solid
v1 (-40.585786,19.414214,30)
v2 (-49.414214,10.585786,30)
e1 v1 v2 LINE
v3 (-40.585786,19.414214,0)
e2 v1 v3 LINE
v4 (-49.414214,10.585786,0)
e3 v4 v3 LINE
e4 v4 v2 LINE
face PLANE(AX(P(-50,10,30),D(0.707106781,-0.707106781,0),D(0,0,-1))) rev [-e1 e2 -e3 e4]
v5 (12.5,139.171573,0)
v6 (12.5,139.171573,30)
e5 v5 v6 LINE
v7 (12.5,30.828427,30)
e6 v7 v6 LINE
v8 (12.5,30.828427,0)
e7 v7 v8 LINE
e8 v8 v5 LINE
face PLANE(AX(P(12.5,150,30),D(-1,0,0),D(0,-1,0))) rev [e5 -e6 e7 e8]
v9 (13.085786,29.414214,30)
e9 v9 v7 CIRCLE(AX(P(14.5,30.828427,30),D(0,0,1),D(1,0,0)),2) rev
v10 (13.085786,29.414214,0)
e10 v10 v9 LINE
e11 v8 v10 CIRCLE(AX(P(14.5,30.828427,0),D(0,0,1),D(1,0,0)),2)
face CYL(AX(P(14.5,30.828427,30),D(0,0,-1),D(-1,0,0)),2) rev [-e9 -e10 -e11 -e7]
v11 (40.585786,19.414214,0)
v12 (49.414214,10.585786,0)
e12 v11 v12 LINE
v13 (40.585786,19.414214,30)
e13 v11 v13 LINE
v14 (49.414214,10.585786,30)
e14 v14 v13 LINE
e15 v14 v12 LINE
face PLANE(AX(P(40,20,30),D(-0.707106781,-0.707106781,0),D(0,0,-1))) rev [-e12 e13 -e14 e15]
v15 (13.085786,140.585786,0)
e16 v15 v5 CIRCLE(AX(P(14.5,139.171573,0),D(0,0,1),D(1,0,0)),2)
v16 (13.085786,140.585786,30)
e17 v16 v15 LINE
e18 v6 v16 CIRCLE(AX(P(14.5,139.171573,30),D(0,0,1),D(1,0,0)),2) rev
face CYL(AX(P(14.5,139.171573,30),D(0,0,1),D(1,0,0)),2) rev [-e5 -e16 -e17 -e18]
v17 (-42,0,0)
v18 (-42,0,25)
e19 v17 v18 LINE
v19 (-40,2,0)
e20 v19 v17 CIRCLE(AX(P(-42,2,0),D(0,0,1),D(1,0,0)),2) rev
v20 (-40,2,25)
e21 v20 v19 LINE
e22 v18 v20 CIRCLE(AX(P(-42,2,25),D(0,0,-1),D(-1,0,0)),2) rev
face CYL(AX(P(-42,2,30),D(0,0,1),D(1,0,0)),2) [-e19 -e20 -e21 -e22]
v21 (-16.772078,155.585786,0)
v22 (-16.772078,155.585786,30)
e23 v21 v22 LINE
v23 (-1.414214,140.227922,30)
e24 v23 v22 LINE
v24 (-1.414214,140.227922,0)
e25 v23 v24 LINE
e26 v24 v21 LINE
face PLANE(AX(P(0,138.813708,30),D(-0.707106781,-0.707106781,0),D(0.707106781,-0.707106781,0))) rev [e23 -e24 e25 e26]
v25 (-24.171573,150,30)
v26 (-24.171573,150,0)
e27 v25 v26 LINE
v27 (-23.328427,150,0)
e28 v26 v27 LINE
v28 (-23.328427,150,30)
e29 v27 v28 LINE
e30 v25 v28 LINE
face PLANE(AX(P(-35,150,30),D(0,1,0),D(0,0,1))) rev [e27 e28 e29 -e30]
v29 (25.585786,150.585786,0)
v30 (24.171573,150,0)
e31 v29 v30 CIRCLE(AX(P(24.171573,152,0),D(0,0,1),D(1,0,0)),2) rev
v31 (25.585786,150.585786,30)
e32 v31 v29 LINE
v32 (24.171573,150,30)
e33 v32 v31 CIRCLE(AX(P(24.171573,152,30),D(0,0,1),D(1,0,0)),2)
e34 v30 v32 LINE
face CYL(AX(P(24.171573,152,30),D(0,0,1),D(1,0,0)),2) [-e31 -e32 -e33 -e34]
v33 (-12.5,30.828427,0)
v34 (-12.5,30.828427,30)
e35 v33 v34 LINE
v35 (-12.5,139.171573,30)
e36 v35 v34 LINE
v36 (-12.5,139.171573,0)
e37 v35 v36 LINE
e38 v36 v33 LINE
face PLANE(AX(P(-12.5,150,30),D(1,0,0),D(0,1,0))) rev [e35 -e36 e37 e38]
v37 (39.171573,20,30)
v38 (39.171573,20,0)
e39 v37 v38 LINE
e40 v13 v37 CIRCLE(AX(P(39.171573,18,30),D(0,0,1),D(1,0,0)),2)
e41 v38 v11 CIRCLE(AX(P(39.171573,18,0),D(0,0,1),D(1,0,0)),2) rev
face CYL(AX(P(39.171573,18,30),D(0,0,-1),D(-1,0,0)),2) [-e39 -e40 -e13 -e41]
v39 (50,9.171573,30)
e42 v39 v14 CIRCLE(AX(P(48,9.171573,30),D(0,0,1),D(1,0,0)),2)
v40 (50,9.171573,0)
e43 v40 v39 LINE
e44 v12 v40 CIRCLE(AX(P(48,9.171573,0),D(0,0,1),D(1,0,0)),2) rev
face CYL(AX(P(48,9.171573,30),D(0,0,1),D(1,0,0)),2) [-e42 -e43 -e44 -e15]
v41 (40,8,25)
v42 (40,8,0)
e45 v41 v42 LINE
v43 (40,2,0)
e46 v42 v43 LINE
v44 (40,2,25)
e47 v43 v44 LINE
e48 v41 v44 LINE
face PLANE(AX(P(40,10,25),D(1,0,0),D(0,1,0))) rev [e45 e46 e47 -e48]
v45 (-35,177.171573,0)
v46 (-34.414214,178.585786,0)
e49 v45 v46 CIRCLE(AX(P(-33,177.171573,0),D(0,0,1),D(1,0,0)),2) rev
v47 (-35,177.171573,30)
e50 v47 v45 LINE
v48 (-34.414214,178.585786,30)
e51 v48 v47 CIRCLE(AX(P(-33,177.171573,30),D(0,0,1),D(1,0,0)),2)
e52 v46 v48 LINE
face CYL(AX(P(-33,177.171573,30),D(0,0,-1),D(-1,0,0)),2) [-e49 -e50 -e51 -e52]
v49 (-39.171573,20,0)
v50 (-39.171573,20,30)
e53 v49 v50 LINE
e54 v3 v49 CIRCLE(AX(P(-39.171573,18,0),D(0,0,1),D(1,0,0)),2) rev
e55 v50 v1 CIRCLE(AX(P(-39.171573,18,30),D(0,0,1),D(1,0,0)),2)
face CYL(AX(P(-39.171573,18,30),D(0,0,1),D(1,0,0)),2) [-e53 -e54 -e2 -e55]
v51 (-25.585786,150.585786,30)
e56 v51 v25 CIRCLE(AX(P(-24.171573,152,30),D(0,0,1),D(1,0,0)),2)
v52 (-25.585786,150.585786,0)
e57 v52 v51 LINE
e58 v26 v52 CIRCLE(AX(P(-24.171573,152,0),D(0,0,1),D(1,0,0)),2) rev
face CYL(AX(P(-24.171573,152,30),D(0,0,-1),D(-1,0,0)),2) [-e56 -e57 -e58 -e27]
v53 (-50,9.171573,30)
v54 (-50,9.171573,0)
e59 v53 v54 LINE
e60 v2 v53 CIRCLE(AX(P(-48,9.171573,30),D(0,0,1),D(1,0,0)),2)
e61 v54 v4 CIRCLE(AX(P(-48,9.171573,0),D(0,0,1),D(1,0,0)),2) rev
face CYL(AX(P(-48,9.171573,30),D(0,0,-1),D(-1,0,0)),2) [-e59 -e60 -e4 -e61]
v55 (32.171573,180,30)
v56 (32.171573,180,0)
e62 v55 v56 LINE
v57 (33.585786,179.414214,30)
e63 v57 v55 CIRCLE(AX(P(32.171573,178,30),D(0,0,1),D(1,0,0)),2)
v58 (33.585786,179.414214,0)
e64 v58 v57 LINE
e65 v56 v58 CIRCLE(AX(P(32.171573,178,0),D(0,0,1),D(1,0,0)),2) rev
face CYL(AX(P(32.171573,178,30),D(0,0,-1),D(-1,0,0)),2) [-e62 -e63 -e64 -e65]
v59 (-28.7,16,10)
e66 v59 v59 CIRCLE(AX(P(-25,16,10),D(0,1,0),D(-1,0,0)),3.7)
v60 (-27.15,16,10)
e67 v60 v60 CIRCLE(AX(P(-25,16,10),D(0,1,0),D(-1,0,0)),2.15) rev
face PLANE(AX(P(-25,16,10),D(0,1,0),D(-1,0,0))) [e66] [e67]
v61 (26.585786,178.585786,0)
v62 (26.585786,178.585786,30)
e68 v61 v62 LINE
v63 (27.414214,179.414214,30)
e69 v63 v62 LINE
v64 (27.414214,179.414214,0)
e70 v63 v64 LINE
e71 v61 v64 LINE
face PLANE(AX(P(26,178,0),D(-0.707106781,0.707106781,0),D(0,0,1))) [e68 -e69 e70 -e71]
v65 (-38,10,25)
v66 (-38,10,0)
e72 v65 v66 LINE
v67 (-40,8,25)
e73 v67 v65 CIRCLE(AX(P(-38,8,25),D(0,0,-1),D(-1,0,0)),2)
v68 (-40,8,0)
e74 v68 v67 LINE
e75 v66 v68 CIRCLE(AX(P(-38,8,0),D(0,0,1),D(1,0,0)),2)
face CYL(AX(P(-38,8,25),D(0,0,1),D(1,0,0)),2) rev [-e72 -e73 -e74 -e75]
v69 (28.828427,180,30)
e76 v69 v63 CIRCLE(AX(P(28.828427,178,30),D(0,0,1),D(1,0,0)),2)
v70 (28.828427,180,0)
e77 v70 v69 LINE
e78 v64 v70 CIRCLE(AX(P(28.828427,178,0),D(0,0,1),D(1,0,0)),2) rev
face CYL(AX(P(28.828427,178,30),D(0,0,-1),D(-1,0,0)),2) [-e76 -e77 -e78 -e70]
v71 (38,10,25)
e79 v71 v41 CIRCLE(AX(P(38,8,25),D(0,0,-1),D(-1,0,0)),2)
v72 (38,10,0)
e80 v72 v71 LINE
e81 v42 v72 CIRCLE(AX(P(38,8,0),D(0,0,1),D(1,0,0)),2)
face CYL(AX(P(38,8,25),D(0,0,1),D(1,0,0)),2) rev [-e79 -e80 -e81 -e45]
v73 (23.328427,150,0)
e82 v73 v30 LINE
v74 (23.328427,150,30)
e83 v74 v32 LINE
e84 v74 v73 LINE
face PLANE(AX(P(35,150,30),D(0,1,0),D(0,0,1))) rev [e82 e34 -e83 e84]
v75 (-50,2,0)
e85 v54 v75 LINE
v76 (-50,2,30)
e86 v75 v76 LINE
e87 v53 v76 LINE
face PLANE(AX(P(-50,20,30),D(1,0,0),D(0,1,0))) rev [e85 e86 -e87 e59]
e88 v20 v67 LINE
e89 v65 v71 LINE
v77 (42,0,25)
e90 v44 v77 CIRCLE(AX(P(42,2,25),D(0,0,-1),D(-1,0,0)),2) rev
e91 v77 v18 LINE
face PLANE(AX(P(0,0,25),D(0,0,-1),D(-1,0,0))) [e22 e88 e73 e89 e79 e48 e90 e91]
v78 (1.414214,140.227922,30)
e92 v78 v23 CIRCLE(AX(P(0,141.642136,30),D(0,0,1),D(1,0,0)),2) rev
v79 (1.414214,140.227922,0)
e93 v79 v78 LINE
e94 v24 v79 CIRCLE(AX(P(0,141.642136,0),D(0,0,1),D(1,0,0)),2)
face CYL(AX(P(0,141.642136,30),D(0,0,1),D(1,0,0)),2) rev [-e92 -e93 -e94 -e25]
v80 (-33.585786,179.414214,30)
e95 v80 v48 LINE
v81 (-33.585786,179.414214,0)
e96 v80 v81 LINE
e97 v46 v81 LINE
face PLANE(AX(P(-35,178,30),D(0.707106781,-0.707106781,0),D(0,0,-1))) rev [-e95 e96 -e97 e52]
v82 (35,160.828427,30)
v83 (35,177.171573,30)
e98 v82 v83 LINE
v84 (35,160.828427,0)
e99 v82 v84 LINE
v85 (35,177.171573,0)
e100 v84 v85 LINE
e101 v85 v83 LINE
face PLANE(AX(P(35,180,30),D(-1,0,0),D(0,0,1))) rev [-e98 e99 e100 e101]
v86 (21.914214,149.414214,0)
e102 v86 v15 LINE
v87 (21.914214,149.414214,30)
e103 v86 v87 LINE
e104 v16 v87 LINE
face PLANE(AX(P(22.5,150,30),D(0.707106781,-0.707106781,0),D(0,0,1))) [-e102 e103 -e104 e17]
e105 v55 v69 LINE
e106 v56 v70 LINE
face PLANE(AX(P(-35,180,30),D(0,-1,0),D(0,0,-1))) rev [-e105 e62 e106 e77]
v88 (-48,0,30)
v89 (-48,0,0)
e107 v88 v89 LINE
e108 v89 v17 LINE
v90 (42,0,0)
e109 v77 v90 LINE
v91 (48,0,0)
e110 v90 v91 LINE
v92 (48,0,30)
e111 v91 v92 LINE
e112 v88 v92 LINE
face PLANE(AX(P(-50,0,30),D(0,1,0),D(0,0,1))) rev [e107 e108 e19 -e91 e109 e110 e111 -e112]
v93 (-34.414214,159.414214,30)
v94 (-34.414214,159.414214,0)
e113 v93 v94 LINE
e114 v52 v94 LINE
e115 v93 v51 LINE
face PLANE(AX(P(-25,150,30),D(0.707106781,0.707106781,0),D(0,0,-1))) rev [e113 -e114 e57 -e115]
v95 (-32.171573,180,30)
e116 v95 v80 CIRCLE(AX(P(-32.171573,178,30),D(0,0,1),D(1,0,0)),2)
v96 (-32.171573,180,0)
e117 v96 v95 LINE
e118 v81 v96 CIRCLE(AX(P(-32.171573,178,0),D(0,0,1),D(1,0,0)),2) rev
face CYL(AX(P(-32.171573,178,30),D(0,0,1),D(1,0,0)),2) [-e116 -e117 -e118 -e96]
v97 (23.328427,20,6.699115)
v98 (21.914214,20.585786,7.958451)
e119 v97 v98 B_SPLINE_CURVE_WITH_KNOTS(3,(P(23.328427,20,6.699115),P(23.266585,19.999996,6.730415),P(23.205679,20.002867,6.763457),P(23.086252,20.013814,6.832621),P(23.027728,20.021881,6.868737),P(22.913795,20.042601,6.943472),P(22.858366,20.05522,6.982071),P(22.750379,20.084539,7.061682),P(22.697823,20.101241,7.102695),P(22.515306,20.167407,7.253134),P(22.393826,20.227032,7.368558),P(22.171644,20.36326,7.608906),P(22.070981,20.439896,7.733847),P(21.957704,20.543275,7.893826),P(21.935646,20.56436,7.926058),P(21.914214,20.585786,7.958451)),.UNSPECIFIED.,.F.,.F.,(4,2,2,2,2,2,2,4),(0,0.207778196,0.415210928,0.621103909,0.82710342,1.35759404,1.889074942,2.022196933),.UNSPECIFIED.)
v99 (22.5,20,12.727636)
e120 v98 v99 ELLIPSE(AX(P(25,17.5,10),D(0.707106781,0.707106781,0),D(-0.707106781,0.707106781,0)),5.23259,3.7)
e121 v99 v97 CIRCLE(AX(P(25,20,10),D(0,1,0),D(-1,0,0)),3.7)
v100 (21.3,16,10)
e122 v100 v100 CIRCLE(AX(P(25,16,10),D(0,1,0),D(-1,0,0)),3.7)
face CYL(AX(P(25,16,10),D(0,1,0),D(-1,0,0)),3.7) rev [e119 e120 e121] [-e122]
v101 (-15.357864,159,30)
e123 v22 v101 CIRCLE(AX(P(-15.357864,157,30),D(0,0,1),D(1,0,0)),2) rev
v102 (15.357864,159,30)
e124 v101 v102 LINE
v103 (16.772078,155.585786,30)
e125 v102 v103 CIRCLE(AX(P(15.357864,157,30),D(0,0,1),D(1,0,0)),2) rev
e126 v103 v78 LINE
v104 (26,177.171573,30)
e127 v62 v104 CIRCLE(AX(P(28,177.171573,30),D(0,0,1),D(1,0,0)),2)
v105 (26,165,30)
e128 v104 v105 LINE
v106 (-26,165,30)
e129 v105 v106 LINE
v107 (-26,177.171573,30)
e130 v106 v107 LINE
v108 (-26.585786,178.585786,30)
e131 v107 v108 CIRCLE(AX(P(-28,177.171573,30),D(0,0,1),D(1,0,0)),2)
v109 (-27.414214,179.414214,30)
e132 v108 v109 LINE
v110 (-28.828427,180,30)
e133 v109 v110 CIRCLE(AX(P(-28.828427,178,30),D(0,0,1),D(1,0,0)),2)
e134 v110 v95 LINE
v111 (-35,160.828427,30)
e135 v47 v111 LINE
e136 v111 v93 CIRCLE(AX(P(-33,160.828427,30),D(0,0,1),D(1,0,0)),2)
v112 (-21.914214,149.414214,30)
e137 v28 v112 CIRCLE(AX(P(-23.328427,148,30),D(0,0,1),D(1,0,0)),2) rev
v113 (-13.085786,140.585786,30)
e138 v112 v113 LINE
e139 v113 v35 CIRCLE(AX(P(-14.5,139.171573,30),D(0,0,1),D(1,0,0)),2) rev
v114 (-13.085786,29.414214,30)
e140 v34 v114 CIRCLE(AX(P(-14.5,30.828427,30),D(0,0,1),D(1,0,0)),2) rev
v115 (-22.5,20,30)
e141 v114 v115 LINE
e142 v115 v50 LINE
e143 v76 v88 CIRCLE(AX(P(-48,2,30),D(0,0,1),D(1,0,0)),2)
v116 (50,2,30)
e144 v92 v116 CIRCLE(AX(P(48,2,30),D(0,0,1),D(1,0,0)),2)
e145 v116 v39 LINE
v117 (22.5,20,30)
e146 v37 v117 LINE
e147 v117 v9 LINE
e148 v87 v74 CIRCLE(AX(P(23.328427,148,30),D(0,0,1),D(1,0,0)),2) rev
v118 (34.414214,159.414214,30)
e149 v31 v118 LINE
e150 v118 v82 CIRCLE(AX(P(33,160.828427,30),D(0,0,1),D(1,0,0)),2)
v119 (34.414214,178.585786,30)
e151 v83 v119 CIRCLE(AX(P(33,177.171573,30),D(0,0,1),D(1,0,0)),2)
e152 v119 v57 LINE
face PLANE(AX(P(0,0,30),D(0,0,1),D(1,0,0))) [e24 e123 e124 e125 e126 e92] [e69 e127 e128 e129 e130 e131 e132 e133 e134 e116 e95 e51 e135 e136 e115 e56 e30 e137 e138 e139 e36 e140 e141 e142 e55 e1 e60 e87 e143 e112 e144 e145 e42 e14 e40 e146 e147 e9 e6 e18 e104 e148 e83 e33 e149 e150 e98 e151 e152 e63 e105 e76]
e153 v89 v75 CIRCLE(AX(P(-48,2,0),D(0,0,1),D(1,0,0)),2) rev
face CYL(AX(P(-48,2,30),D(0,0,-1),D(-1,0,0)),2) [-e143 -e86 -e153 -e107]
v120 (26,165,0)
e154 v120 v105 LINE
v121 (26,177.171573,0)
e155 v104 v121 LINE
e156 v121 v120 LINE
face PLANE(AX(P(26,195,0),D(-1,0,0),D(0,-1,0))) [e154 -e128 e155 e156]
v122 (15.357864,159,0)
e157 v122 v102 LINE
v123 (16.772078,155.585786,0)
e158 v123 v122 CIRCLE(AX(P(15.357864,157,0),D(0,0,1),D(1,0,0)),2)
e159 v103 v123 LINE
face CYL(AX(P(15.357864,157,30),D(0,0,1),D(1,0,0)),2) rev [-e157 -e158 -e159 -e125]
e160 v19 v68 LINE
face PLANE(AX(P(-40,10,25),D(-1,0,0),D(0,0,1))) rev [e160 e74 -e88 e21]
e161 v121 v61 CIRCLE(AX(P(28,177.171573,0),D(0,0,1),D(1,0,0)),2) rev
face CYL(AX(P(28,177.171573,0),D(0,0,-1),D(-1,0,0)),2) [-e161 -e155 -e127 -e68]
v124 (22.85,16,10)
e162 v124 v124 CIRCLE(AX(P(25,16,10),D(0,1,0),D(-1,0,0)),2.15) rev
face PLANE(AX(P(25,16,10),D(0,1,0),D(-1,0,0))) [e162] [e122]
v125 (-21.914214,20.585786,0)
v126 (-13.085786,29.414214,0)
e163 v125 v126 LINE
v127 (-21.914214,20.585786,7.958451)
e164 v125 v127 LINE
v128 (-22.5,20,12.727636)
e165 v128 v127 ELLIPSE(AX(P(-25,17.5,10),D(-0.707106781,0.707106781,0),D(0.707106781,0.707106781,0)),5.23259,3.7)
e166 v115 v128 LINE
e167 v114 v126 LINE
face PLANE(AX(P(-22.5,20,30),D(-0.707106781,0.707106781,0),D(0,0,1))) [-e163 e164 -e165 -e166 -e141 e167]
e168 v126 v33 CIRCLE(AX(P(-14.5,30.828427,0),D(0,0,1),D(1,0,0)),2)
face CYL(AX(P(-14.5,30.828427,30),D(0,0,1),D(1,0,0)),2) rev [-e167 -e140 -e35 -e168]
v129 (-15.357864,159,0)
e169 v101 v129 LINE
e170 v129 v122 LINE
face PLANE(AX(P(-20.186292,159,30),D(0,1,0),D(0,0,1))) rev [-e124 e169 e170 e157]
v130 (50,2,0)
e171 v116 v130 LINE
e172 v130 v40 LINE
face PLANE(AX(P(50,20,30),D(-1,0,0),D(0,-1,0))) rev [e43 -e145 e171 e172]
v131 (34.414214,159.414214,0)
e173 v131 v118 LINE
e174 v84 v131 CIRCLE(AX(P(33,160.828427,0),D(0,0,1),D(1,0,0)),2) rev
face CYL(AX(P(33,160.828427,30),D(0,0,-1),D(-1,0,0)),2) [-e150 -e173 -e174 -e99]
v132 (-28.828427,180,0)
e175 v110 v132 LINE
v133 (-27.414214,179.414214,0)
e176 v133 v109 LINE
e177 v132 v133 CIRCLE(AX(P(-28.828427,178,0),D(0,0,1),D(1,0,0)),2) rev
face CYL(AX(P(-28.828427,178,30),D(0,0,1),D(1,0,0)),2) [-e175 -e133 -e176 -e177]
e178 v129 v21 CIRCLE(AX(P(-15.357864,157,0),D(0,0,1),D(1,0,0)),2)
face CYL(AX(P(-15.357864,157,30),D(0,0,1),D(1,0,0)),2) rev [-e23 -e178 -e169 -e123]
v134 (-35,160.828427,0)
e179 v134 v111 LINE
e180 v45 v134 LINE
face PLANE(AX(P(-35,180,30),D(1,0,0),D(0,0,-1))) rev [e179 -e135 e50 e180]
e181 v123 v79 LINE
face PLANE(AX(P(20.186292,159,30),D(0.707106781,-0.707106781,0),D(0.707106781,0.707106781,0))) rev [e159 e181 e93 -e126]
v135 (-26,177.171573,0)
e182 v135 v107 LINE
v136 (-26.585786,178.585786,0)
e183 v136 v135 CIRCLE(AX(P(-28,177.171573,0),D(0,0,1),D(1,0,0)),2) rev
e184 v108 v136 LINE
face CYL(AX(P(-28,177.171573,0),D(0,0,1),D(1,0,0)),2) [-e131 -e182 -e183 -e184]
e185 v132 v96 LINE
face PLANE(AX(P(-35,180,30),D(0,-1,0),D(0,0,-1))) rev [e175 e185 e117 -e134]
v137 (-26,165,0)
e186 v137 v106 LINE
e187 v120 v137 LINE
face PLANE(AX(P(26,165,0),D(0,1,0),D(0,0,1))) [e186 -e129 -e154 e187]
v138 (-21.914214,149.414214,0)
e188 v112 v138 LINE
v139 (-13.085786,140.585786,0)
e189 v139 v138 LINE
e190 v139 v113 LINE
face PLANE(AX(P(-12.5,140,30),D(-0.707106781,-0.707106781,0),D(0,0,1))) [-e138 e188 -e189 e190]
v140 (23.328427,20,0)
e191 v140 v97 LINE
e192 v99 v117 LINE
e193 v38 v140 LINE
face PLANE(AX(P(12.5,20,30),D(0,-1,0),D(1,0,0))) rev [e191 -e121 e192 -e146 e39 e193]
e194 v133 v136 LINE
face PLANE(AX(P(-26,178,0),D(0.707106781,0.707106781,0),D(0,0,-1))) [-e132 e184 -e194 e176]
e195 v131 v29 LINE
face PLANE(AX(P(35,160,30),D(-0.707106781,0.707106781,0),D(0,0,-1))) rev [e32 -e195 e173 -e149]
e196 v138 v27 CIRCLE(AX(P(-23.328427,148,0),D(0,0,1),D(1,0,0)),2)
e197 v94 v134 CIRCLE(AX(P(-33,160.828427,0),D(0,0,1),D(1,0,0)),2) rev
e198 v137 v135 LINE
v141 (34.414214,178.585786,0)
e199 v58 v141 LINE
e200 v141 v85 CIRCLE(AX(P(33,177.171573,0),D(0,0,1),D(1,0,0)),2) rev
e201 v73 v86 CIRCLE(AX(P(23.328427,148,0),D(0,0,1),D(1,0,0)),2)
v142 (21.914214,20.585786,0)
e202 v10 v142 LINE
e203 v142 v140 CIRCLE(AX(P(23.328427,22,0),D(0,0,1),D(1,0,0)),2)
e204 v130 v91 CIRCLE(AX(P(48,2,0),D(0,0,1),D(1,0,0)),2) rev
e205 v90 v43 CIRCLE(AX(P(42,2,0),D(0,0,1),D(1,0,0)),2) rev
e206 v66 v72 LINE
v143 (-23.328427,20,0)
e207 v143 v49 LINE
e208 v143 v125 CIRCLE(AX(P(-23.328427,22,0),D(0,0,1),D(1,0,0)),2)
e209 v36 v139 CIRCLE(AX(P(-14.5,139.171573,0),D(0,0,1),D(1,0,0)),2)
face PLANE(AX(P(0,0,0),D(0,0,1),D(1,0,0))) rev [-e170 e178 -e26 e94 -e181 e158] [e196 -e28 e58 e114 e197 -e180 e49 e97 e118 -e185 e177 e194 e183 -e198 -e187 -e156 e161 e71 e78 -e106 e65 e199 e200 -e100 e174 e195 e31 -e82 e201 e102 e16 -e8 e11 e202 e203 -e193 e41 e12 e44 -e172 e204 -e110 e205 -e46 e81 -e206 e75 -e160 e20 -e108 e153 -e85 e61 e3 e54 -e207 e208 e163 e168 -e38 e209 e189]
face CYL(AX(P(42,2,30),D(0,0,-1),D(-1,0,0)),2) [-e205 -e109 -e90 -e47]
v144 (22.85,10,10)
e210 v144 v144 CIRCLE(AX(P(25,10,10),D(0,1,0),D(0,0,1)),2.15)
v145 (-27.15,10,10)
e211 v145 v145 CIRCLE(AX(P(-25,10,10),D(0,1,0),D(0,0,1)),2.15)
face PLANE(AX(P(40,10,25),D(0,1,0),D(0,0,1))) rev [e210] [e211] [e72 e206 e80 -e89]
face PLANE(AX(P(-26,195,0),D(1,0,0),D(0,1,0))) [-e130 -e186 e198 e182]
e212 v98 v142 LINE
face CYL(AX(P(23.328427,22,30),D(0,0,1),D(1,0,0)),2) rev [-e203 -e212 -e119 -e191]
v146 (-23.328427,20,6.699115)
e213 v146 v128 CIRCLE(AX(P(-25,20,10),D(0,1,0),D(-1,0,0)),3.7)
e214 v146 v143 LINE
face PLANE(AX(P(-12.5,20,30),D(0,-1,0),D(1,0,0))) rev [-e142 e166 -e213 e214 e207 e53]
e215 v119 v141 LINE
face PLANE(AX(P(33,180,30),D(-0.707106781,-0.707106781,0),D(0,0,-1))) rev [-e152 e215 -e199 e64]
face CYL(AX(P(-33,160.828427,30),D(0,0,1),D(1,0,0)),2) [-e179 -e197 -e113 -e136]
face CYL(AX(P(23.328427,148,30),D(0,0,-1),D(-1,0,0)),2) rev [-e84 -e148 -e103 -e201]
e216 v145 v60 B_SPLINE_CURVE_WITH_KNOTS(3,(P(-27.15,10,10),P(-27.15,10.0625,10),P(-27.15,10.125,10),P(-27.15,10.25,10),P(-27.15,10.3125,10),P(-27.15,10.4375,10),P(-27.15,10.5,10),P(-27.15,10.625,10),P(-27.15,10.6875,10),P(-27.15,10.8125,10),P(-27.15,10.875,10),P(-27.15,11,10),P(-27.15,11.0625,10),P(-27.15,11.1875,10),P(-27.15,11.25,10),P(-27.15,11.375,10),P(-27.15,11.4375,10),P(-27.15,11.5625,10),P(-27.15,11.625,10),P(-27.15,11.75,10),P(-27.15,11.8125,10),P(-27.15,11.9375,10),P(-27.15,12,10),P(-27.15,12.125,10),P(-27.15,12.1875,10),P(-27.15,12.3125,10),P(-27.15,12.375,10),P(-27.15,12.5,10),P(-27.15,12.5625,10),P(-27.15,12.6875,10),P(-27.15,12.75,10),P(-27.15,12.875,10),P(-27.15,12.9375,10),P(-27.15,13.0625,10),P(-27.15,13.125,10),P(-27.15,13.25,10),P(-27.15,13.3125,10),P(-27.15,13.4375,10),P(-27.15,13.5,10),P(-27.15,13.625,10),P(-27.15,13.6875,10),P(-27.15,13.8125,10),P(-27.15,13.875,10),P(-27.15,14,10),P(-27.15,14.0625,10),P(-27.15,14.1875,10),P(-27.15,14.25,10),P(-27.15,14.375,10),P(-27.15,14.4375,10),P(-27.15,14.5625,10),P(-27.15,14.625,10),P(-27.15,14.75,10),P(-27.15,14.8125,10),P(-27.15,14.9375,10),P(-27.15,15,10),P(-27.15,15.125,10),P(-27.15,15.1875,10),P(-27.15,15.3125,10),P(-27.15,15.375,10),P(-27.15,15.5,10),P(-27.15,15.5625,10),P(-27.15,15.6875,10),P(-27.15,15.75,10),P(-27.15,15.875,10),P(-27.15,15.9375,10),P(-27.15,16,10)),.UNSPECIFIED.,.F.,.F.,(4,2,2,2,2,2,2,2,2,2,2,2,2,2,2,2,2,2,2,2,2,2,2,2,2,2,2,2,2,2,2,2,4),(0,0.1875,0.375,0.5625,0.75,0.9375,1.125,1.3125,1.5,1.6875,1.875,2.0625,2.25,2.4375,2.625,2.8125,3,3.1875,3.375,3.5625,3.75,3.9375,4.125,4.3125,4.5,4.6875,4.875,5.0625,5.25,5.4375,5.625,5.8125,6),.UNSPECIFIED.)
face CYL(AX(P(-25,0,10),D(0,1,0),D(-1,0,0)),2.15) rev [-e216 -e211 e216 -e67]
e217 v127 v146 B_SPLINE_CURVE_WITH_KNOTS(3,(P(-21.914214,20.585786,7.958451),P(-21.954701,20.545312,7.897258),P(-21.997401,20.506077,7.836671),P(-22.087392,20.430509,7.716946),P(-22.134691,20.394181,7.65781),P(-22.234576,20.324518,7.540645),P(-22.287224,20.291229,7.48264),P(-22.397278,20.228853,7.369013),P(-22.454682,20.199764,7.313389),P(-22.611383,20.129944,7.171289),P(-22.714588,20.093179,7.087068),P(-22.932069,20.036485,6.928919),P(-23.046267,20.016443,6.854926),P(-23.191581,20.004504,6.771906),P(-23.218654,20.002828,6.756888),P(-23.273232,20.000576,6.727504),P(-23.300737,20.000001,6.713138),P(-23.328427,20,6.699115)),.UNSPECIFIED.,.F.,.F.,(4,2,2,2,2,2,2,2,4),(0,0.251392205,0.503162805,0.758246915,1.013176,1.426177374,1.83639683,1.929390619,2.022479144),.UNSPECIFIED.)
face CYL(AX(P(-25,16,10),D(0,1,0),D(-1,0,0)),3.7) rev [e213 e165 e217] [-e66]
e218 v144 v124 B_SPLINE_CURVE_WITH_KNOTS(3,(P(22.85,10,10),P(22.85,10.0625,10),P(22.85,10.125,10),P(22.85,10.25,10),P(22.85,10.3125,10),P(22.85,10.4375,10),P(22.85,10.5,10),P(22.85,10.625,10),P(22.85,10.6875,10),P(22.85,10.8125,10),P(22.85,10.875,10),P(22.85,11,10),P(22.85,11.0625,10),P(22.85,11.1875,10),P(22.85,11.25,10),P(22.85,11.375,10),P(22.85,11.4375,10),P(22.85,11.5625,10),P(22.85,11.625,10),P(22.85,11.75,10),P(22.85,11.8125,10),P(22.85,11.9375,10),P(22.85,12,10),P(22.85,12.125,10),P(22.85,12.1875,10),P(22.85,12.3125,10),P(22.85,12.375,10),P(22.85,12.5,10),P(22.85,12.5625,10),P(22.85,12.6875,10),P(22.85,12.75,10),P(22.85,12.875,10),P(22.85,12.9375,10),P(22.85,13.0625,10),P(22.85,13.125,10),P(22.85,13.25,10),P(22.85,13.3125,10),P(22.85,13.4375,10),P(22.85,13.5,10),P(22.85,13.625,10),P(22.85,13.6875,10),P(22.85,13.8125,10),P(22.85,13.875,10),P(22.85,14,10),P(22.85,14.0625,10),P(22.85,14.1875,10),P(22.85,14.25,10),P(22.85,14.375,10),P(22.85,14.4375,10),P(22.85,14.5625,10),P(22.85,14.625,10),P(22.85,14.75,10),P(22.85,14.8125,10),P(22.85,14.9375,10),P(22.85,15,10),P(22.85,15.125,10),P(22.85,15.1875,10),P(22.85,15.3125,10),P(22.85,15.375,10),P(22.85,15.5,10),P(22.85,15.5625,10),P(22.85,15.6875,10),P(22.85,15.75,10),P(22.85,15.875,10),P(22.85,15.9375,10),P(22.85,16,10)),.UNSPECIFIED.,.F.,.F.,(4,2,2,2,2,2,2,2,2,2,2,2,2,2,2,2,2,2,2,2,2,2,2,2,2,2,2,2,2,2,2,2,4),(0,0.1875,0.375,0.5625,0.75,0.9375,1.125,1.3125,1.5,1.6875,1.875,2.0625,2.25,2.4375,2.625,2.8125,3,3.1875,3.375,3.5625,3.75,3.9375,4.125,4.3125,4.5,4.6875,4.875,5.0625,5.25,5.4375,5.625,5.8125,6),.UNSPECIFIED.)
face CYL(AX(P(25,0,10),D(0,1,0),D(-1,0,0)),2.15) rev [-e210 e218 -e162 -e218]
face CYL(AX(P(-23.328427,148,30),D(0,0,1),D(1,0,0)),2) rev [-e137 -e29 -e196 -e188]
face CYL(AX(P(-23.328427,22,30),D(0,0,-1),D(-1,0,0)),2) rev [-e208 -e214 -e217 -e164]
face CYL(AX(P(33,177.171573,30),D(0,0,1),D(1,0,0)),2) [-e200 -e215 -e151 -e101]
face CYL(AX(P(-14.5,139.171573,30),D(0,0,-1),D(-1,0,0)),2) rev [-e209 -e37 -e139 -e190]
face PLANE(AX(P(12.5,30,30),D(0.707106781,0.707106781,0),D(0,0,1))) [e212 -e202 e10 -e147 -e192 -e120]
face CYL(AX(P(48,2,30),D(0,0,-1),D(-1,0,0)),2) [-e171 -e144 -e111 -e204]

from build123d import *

# Parameters (mm, degrees)
EXTRUDE_1_DEPTH     = 30
SKETCH_3_W          = 52
SKETCH_3_H          = 30
CUT_EXTRUDE_1_DEPTH = 190.208879284
SKETCH_4_W          = 80
SKETCH_4_H          = 20
CUT_EXTRUDE_2_DEPTH = 25
SKETCH_5_R          = 2.15
CUT_EXTRUDE_3_DEPTH = 171.293863659
SKETCH_6_R          = 3.7
CUT_EXTRUDE_4_DEPTH = 4
CHAMFER_1_SIZE      = 10
CHAMFER_2_SIZE      = 2
FILLET_1_R          = 2
CUT_EXTRUDE_5_DEPTH = 190.208879284
FILLET_2_R          = 2


with BuildPart() as part:
    # 草图2 → 凸台-拉伸1 (new body)
    with BuildSketch(Plane.XY):
        Polygon((-35, 180), (35, 180), (35, 150), (12.5, 150), (12.5, 20), (50, 20), (50, 0), (-50, 0), (-50, 20), (-12.5, 20), (-12.5, 150), (-35, 150), align=None)
    extrude(amount=EXTRUDE_1_DEPTH)

    # 草图3 → 切除-拉伸1 (cut, through all)
    with BuildSketch(Plane(origin=(0, 0, 30), x_dir=(-1, 0, 0), z_dir=(0, 0, -1))):
        with Locations((0, 180)):
            Rectangle(SKETCH_3_W, SKETCH_3_H)
    extrude(amount=CUT_EXTRUDE_1_DEPTH, mode=Mode.SUBTRACT)

    # 草图4 → 切除-拉伸2 (cut)
    with BuildSketch(Plane(origin=(0, 0, 0), x_dir=(-1, 0, 0), z_dir=(0, 0, -1))):
        Rectangle(SKETCH_4_W, SKETCH_4_H)
    extrude(amount=-CUT_EXTRUDE_2_DEPTH, mode=Mode.SUBTRACT)

    # 草图5 → 切除-拉伸3 (cut, through all)
    with BuildSketch(Plane(origin=(0, 20, 0), x_dir=(1, 0, 0), z_dir=(0, 1, 0))):
        with Locations(Location((-25, -10, 0), (0, 0, 180))):
            Circle(SKETCH_5_R)
        with Locations(Location((25, -10, 0), (0, 0, 180))):
            Circle(SKETCH_5_R)
    extrude(amount=-CUT_EXTRUDE_3_DEPTH, mode=Mode.SUBTRACT)

    # 草图6 → 切除-拉伸4 (cut)
    with BuildSketch(Plane(origin=(0, 20, 0), x_dir=(1, 0, 0), z_dir=(0, 1, 0))):
        with Locations(Location((25, -10, 0), (0, 0, 180))):
            Circle(SKETCH_6_R)
        with Locations(Location((-25, -10, 0), (0, 0, 180))):
            Circle(SKETCH_6_R)
    extrude(amount=-CUT_EXTRUDE_4_DEPTH, mode=Mode.SUBTRACT)

    # 倒角1
    # the kernel refuses this chamfer: 10 mm, written as the material it adds along each edge
    with BuildSketch(Plane(origin=(12.5, 150, 0), x_dir=(-0.027495876610586452, -0.9996219169112968, 0), z_dir=(0, 0, 1)), Plane(origin=(-12.5, 150, 0), x_dir=(-0.9996219169112968, 0.0274958766105877, 0), z_dir=(0, 0, 1))) as chamfer_1_piece_1:
        Polygon((CHAMFER_1_SIZE * 0.999621916911, CHAMFER_1_SIZE * 0.0274958766106), (-CHAMFER_1_SIZE * 0.0274958766106, CHAMFER_1_SIZE * 0.999621916911), (0, 0), align=None)
    extrude(amount=30)
    with BuildSketch(Plane(origin=(12.5, 20, 0), x_dir=(0.9996219169112968, -0.027495876610586313, 0), z_dir=(0, 0, 1))) as chamfer_1_piece_2_section:
        Polygon((CHAMFER_1_SIZE * 0.999621916911, CHAMFER_1_SIZE * 0.0274958766106), (-CHAMFER_1_SIZE * 0.0274958766106, CHAMFER_1_SIZE * 0.999621916911), (0, 0), align=None)
    chamfer_1_piece_2 = extrude(amount=30, mode=Mode.PRIVATE)
    chamfer_1_piece_2 = chamfer_1_piece_2 - Plane(origin=(25, 23.307134121, 10), x_dir=(-1, 0, 0), z_dir=(0, 1, 0)) * Cylinder(3.7, 100, mode=Mode.PRIVATE)
    add(chamfer_1_piece_2)
    with BuildSketch(Plane(origin=(-12.5, 20, 0), x_dir=(0.027495876610586147, 0.9996219169112968, 0), z_dir=(0, 0, 1))) as chamfer_1_piece_3_section:
        Polygon((CHAMFER_1_SIZE * 0.999621916911, CHAMFER_1_SIZE * 0.0274958766106), (-CHAMFER_1_SIZE * 0.0274958766106, CHAMFER_1_SIZE * 0.999621916911), (0, 0), align=None)
    chamfer_1_piece_3 = extrude(amount=30, mode=Mode.PRIVATE)
    chamfer_1_piece_3 = chamfer_1_piece_3 - Plane(origin=(-25, 23.30713415, 10), x_dir=(-1, 0, 0), z_dir=(0, 1, 0)) * Cylinder(3.7, 100, mode=Mode.PRIVATE)
    add(chamfer_1_piece_3)
    # the kernel refuses this chamfer: 10 mm, written as the material it takes off along each edge
    with BuildSketch(Plane(origin=(35, 150, -25.71682988), x_dir=(-0.9996219169112968, -0.0274958766105877, 0), z_dir=(0, 0, 1)), Plane(origin=(-35, 150, -25.71682988), x_dir=(-0.027495876610586282, 0.9996219169112968, 0), z_dir=(0, 0, 1))) as chamfer_1_2_piece_1:
        Polygon((CHAMFER_1_SIZE * 0.999621916911, -CHAMFER_1_SIZE * 0.0274958766106), (-CHAMFER_1_SIZE * 0.0274958766106, -CHAMFER_1_SIZE * 0.999621916911), (0, 0), align=None)
    extrude(amount=81.433659759, mode=Mode.SUBTRACT)
    with BuildSketch(Plane(origin=(50, 20, -25.71682988), x_dir=(-0.9996219169112968, 0.027495876610586317, 0), z_dir=(0, 0, 1)), Plane(origin=(-50, 20, -25.71682988), x_dir=(-0.027495876610585626, -0.9996219169112968, 0), z_dir=(0, 0, 1))) as chamfer_1_2_piece_2:
        Polygon((CHAMFER_1_SIZE * 0.999621916911, CHAMFER_1_SIZE * 0.0274958766106), (-CHAMFER_1_SIZE * 0.0274958766106, CHAMFER_1_SIZE * 0.999621916911), (0, 0), align=None)
    extrude(amount=81.433659759, mode=Mode.SUBTRACT)

    # 倒角2
    chamfer_2_edges = [part.edges().sort_by_distance(p)[0] for p in [
        (-35, 180, 15),
        (35, 180, 15),
        (26, 180, 15),
        (-26, 180, 15),
    ]]
    chamfer(chamfer_2_edges, length=CHAMFER_2_SIZE)

    # 圆角1
    fillet_1_edges = [part.edges().sort_by_distance(p)[0] for p in [
        (-35, 160, 15),
        (-25, 150, 15),
        (-22.5, 150, 15),
        (-12.5, 140, 15),
        (-12.5, 30, 15),
        (-22.5, 20, 3.63618183),
        (-40, 20, 15),
        (-50, 10, 15),
        (-50, 0, 15),
        (-40, 0, 12.5),
        (-40, 10, 12.5),
        (40, 10, 12.5),
        (40, 0, 12.5),
        (50, 0, 15),
        (50, 10, 15),
        (40, 20, 15),
        (22.5, 20, 3.63618183),
        (12.5, 30, 15),
        (22.5, 150, 15),
        (25, 150, 15),
        (35, 160, 15),
        (35, 178, 15),
        (33, 180, 15),
        (28, 180, 15),
        (26, 178, 15),
        (-26, 178, 15),
        (-28, 180, 15),
        (-33, 180, 15),
        (-35, 178, 15),
        (12.5, 140, 15),
    ]]
    fillet(fillet_1_edges, radius=FILLET_1_R)

    # 草图7 → 切除-拉伸5 (cut, through all)
    with BuildSketch(Plane(origin=(0, 0, 0), x_dir=(-1, 0, 0), z_dir=(0, 0, -1))):
        Polygon((-20.186291501, 159), (0, 138.813708499), (20.186291501, 159), align=None)
    extrude(amount=-CUT_EXTRUDE_5_DEPTH, mode=Mode.SUBTRACT)

    # 圆角2
    fillet_2_edges = [part.edges().sort_by_distance(p)[0] for p in [
        (20.186291501, 159, 15),
        (-20.186291501, 159, 15),
        (0, 138.813708499, 15),
    ]]
    fillet(fillet_2_edges, radius=FILLET_2_R)


solid = part.part
